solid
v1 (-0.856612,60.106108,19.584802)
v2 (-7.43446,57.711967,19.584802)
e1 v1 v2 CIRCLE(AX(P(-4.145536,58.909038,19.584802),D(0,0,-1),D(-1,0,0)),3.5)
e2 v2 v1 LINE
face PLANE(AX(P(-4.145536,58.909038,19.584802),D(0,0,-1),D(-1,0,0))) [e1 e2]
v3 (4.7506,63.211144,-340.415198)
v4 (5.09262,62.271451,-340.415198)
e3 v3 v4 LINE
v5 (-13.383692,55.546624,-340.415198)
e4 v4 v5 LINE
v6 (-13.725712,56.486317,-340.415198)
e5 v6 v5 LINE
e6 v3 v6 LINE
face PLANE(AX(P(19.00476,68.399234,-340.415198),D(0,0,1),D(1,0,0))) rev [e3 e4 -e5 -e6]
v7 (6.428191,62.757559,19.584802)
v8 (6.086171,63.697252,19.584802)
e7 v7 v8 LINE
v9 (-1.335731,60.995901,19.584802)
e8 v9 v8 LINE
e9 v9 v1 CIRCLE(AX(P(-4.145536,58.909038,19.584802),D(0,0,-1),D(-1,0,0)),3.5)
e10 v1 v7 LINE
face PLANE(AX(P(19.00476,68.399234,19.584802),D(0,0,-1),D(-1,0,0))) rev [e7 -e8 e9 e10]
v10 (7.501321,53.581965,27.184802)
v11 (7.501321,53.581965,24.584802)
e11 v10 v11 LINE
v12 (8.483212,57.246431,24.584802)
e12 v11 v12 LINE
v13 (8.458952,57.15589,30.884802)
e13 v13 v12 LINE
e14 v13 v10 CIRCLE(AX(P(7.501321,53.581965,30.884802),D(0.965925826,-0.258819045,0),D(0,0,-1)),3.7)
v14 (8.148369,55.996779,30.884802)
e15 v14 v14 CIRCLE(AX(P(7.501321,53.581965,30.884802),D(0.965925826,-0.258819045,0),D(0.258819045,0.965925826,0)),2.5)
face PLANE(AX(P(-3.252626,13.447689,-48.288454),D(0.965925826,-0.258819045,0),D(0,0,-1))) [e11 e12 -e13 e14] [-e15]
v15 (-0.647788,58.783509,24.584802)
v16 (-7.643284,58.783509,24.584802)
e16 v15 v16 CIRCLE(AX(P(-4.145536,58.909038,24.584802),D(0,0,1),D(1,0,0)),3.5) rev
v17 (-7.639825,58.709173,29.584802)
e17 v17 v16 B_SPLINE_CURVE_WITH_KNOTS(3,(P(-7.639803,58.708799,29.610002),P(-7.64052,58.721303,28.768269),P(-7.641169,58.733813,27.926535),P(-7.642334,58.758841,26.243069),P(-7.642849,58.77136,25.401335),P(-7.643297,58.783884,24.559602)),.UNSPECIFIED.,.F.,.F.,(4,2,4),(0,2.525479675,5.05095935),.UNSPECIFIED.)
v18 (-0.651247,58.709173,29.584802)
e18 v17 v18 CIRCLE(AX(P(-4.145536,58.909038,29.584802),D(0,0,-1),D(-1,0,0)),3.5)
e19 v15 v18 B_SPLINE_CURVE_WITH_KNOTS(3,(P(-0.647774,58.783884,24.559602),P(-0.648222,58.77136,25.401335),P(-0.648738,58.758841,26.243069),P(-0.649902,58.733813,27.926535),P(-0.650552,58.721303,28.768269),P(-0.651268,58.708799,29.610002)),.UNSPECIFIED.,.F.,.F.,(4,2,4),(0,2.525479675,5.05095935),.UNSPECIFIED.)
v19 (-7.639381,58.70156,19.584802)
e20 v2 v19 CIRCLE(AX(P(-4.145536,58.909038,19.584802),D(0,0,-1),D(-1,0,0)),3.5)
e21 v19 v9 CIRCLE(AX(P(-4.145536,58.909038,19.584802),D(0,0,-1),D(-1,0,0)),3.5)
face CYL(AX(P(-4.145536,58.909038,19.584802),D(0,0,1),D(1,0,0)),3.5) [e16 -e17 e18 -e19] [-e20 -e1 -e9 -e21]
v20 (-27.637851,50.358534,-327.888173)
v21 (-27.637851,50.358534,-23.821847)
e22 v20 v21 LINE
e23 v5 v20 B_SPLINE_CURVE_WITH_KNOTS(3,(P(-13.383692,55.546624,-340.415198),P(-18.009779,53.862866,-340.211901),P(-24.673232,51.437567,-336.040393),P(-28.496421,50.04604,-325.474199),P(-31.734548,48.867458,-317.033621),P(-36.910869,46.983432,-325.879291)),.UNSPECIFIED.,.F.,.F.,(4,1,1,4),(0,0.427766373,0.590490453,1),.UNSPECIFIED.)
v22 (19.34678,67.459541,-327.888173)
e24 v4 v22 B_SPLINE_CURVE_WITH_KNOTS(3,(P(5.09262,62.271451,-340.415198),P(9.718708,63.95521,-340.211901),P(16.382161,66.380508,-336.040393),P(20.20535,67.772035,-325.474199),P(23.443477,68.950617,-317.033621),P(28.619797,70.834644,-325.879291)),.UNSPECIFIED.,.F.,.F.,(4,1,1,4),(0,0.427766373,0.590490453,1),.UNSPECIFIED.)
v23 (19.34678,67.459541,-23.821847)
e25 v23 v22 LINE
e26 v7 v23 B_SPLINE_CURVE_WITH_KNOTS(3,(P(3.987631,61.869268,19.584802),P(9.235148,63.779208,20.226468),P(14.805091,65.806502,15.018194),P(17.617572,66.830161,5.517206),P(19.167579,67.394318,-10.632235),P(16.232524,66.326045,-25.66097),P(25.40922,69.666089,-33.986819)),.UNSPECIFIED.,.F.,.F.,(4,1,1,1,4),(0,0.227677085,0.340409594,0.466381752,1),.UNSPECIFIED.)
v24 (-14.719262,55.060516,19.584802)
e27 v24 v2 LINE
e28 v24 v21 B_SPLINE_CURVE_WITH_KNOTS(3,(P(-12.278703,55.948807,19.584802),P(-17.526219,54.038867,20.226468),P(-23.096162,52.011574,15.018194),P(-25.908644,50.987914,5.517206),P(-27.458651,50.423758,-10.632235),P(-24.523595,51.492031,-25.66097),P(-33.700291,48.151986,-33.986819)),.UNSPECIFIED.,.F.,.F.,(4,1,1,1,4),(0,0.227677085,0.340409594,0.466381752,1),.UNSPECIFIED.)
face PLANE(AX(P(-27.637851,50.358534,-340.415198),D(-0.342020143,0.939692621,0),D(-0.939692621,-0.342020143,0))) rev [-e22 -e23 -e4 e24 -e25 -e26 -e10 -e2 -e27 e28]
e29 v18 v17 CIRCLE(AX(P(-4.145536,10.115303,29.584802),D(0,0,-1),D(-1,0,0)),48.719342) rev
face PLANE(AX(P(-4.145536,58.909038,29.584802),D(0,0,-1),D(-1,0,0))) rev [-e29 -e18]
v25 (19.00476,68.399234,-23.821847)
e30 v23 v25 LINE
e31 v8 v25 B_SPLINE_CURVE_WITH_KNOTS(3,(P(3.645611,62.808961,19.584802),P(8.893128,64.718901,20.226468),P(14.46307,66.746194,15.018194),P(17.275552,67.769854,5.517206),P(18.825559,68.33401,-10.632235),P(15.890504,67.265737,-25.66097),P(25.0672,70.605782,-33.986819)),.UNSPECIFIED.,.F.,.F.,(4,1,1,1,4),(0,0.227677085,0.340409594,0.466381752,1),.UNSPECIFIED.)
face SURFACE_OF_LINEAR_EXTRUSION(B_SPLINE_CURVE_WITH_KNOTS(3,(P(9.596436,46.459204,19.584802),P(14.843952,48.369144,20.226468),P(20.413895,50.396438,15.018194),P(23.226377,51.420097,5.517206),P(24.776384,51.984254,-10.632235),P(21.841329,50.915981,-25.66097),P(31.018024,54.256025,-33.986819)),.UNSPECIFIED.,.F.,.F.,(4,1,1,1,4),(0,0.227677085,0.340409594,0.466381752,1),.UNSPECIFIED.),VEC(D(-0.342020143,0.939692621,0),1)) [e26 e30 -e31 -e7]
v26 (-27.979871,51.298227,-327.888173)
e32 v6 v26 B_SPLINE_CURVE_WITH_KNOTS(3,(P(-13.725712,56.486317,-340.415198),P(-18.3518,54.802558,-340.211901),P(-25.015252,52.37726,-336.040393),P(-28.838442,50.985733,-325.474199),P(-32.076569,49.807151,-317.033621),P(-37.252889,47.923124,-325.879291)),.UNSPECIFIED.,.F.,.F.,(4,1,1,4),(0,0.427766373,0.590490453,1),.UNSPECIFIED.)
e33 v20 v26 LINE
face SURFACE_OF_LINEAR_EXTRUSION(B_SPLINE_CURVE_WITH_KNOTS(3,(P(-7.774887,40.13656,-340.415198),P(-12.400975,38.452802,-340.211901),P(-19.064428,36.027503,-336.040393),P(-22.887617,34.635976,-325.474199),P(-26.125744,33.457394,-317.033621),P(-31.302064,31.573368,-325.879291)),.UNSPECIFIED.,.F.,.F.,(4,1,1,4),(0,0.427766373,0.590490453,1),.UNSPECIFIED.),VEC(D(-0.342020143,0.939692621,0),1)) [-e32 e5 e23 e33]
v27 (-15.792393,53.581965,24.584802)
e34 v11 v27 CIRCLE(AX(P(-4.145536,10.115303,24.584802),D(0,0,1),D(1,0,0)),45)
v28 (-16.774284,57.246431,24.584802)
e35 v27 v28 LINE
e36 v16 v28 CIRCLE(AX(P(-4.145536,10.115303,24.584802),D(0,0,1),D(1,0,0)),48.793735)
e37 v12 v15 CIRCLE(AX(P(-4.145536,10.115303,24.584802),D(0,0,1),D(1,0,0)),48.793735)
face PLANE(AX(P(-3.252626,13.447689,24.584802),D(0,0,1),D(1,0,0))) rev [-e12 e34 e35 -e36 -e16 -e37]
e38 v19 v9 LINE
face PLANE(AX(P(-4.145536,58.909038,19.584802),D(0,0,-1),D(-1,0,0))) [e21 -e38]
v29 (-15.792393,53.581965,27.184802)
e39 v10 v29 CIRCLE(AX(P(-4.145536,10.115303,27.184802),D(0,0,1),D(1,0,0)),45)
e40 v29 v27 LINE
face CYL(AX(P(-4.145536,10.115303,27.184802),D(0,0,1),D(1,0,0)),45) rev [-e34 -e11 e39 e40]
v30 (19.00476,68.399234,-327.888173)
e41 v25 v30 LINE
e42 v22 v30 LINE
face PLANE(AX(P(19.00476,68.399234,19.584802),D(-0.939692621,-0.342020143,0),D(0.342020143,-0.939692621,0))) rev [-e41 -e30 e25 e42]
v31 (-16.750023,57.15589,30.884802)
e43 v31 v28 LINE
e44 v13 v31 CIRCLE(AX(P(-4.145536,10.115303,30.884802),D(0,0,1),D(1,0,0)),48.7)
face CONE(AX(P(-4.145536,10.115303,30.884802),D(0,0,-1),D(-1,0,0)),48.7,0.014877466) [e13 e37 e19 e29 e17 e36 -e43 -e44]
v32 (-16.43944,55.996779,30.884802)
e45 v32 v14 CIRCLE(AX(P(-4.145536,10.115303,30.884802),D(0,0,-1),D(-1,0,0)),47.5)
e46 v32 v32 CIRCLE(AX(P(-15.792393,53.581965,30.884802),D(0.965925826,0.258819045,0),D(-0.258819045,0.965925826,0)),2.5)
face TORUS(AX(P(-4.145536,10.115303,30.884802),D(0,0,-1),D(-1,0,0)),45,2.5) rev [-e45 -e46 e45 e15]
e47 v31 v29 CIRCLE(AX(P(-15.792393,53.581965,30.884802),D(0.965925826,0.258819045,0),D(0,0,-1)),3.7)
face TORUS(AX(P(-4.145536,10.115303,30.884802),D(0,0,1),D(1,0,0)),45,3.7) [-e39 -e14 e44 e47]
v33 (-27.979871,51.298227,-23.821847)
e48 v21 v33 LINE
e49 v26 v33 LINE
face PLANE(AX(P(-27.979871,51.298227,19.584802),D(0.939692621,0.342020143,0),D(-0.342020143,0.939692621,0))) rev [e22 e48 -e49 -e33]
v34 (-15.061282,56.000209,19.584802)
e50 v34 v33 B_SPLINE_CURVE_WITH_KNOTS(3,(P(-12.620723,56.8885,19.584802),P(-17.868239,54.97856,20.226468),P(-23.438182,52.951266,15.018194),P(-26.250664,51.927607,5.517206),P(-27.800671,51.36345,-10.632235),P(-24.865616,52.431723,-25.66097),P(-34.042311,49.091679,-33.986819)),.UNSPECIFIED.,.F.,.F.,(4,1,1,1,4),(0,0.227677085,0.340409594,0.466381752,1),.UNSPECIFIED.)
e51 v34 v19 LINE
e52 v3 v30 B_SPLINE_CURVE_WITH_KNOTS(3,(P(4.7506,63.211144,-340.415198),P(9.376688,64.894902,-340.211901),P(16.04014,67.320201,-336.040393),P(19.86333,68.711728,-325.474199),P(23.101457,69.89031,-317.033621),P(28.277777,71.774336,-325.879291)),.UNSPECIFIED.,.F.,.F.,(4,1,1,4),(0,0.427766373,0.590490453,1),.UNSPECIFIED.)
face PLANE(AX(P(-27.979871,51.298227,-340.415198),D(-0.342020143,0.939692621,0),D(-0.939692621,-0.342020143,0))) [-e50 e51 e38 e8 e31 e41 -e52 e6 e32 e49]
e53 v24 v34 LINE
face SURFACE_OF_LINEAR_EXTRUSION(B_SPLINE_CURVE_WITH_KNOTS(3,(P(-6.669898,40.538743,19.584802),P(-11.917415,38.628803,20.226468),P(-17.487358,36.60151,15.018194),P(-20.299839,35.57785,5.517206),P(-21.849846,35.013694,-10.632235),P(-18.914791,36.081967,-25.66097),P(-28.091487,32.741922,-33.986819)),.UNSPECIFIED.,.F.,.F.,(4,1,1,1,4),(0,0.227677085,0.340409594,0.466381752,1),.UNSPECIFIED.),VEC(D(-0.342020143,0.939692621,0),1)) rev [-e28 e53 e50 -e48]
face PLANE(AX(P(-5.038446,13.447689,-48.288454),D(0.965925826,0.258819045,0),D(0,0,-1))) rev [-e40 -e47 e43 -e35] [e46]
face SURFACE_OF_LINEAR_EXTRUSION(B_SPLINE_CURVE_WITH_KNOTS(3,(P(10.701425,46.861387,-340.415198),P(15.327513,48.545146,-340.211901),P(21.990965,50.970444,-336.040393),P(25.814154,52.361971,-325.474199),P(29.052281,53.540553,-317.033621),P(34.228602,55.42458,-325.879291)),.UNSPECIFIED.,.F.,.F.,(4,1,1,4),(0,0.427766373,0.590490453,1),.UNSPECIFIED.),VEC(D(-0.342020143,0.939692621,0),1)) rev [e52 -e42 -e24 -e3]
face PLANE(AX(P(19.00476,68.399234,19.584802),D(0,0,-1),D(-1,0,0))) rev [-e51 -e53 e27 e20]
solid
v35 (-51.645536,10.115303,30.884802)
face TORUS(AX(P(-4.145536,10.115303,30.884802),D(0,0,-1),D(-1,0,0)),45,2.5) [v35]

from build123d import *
from build123d.topology import SkipClean

# Parameters (mm, degrees)
REVOLVE_4_ANGLE          = 30
SKETCH_4_R               = 3.5
EXTRUDE_1_DEPTH          = 5
SKETCH_7_W               = 50
SKETCH_7_H               = 360
EXTRUDE_2_DEPTH          = 1
CUT_EXTRUDE_1_DEPTH      = 343.944475712
CUT_EXTRUDE_1_DEPTH_BACK = 343.944475712
CUT_EXTRUDE_2_DEPTH      = 343.944475826
CUT_EXTRUDE_2_DEPTH_BACK = 343.944475826
SKETCH_10_R              = 2.5
SKETCH_13_R              = 2.5


# Read off the part's stored shape, not the designer's step: 旋转4
with BuildPart() as part:
    # 旋转4 outline → 旋转4 (revolve)
    with BuildSketch(Plane(origin=(-4.145535771, 10.115302746, 0), x_dir=(0.2588190451025214, 0.9659258262890681, 0), z_dir=(0.9659258262890681, -0.2588190451025214, 0))):
        with BuildLine():
            Line((48.79373495, 24.584801914), (48.7, 30.884801913))
            ThreePointArc((48.7, 30.884801913), (42.38370491, 33.501097003), (45, 27.184801913))
            Line((45, 27.184801913), (45, 24.584801914))
            Line((45, 24.584801914), (48.79373495, 24.584801914))
        make_face()
    revolve(axis=Axis((-4.145535771, 10.115302746, 0), (0, 0, 1)), revolution_arc=REVOLVE_4_ANGLE)

    # 草图4 → 凸台-拉伸1 (add, symmetric)
    with SkipClean():  # the faces are left unmerged after this step: merging them gives an invalid solid
        with BuildSketch(Plane(origin=(0, 0, 24.584801914), x_dir=(-1, 0, 0), z_dir=(0, 0, -1))):
            with Locations(Location((4.145535771, 58.909037696, 0), (0, 0, 182.055368844))):
                Circle(SKETCH_4_R)
        extrude(amount=EXTRUDE_1_DEPTH, both=True)

    # 草图7 → 凸台-拉伸2 (add)
    with SkipClean():  # the faces are left unmerged after this step: merging them gives an invalid solid
        with BuildSketch(Plane(origin=(-19.41793533, 53.35033885, 0), x_dir=(-0.9396926207859081, -0.34202014332566943, 0), z_dir=(-0.34202014332566943, 0.9396926207859081, 0))):
            with Locations((-16.252548143, -160.415198086)):
                Rectangle(SKETCH_7_W, SKETCH_7_H)
        extrude(amount=EXTRUDE_2_DEPTH)

    # 草图8 → 切除-拉伸1 (cut, two sides: drawn at the far end of the back side and taken through both)
    with SkipClean():  # the faces are left unmerged after this step: merging them gives an invalid solid
        with BuildSketch(Plane(origin=(-19.759955473, 54.290031471, 0), x_dir=(0.9396926207859082, 0.3420201433256695, 0), z_dir=(-0.3420201433256695, 0.9396926207859082, 0)).offset(-CUT_EXTRUDE_1_DEPTH_BACK)):
            with BuildLine():
                Line((41.252548143, -19.584801914), (41.252548143, 23.821846561))
                add(Edge.make_bspline(
                    [(27.504872765, -19.584801914), (31.73786331, -19.07232861), (36.657141019, -14.263450573), (39.412364189, -5.517206126), (40.655209173, 6.65100326), (39.363996158, 17.087656662), (41.252548143, 23.821846561)],
                    knots=[0.037048612, 0.037048612, 0.037048612, 0.037048612, 0.227677085, 0.340409594, 0.466381752, 0.809603539, 0.809603539, 0.809603539, 0.809603539], degree=3))
                Line((27.504872765, -19.584801914), (41.252548143, -19.584801914))
            make_face()
            with BuildLine():
                Line((-8.747451857, -19.584801914), (5.000223521, -19.584801914))
                add(Edge.make_bspline(
                    [(5.000223521, -19.584801914), (0.767232977, -19.07232861), (-4.152044732, -14.263450573), (-6.907267902, -5.517206126), (-8.150112886, 6.65100326), (-6.858899871, 17.087656662), (-8.747451857, 23.821846561)],
                    knots=[0.037048612, 0.037048612, 0.037048612, 0.037048612, 0.227677085, 0.340409594, 0.466381752, 0.809603539, 0.809603539, 0.809603539, 0.809603539], degree=3))
                Line((-8.747451857, 23.821846561), (-8.747451857, -19.584801914))
            make_face()
        extrude(amount=CUT_EXTRUDE_1_DEPTH + CUT_EXTRUDE_1_DEPTH_BACK, mode=Mode.SUBTRACT)

    # 草图9 → 切除-拉伸2 (cut, two sides: drawn at the far end of the back side and taken through both)
    with SkipClean():  # the faces are left unmerged after this step: merging them gives an invalid solid
        with BuildSketch(Plane(origin=(-19.759955473, 54.290031471, 0), x_dir=(0.9396926207859082, 0.3420201433256695, 0), z_dir=(-0.3420201433256695, 0.9396926207859082, 0)).offset(-CUT_EXTRUDE_2_DEPTH_BACK)):
            with BuildLine():
                add(Edge.make_bspline(
                    [(26.083588303, 340.415198086), (31.006568105, 340.211900579), (38.097666372, 336.040393165), (40.500108091, 329.801156179), (41.252548143, 327.888172846)],
                    knots=[0, 0, 0, 0, 0.427766373, 0.590490453, 0.590490453, 0.590490453, 0.590490453], degree=3))
                Line((41.252548143, 327.888172846), (41.252548143, 340.415198086))
                Line((41.252548143, 340.415198086), (26.083588303, 340.415198086))
            make_face()
            with BuildLine():
                add(Edge.make_bspline(
                    [(6.421507983, 340.415198086), (1.498528181, 340.211900579), (-5.592570086, 336.040393165), (-7.995011804, 329.801156179), (-8.747451857, 327.888172846)],
                    knots=[0, 0, 0, 0, 0.427766373, 0.590490453, 0.590490453, 0.590490453, 0.590490453], degree=3))
                Line((6.421507983, 340.415198086), (-8.747451857, 340.415198086))
                Line((-8.747451857, 340.415198086), (-8.747451857, 327.888172846))
            make_face()
        extrude(amount=CUT_EXTRUDE_2_DEPTH + CUT_EXTRUDE_2_DEPTH_BACK, mode=Mode.SUBTRACT)

    # 草图10 → 切除-旋转1 (revolve, cut)
    with SkipClean():  # the faces are left unmerged after this step: merging them gives an invalid solid
        with BuildSketch(Plane(origin=(-6.396663217, 1.713980743, 0), x_dir=(0, 0, -1), z_dir=(0.9659258262890681, -0.25881904510252135, 0)), mode=Mode.PRIVATE) as cut_revolve_1_sk:
            with Locations((-30.884801913, 53.697688553)):
                Circle(SKETCH_10_R)
        revolve(cut_revolve_1_sk.sketch.rotate(Axis((-4.145535771, 10.115302746, 0), (0, 0, 1)), 15), axis=Axis((-4.145535771, 10.115302746, 0), (0, 0, 1)), mode=Mode.SUBTRACT)


with BuildPart() as body_2:
    # 草图13 → 旋转5 (revolve)
    with BuildSketch(Plane(origin=(-6.396663217, 1.713980743, 0), x_dir=(0, 0, -1), z_dir=(0.9659258262890681, -0.25881904510252135, 0)), mode=Mode.PRIVATE) as revolve_5_sk:
        with Locations((-30.884801913, 53.697688553)):
            Circle(SKETCH_13_R)
    revolve(revolve_5_sk.sketch.rotate(Axis((-4.145535771, 10.115302746, 0), (0, 0, 1)), 15), axis=Axis((-4.145535771, 10.115302746, 0), (0, 0, 1)))


solid = Compound([part.part, body_2.part])
